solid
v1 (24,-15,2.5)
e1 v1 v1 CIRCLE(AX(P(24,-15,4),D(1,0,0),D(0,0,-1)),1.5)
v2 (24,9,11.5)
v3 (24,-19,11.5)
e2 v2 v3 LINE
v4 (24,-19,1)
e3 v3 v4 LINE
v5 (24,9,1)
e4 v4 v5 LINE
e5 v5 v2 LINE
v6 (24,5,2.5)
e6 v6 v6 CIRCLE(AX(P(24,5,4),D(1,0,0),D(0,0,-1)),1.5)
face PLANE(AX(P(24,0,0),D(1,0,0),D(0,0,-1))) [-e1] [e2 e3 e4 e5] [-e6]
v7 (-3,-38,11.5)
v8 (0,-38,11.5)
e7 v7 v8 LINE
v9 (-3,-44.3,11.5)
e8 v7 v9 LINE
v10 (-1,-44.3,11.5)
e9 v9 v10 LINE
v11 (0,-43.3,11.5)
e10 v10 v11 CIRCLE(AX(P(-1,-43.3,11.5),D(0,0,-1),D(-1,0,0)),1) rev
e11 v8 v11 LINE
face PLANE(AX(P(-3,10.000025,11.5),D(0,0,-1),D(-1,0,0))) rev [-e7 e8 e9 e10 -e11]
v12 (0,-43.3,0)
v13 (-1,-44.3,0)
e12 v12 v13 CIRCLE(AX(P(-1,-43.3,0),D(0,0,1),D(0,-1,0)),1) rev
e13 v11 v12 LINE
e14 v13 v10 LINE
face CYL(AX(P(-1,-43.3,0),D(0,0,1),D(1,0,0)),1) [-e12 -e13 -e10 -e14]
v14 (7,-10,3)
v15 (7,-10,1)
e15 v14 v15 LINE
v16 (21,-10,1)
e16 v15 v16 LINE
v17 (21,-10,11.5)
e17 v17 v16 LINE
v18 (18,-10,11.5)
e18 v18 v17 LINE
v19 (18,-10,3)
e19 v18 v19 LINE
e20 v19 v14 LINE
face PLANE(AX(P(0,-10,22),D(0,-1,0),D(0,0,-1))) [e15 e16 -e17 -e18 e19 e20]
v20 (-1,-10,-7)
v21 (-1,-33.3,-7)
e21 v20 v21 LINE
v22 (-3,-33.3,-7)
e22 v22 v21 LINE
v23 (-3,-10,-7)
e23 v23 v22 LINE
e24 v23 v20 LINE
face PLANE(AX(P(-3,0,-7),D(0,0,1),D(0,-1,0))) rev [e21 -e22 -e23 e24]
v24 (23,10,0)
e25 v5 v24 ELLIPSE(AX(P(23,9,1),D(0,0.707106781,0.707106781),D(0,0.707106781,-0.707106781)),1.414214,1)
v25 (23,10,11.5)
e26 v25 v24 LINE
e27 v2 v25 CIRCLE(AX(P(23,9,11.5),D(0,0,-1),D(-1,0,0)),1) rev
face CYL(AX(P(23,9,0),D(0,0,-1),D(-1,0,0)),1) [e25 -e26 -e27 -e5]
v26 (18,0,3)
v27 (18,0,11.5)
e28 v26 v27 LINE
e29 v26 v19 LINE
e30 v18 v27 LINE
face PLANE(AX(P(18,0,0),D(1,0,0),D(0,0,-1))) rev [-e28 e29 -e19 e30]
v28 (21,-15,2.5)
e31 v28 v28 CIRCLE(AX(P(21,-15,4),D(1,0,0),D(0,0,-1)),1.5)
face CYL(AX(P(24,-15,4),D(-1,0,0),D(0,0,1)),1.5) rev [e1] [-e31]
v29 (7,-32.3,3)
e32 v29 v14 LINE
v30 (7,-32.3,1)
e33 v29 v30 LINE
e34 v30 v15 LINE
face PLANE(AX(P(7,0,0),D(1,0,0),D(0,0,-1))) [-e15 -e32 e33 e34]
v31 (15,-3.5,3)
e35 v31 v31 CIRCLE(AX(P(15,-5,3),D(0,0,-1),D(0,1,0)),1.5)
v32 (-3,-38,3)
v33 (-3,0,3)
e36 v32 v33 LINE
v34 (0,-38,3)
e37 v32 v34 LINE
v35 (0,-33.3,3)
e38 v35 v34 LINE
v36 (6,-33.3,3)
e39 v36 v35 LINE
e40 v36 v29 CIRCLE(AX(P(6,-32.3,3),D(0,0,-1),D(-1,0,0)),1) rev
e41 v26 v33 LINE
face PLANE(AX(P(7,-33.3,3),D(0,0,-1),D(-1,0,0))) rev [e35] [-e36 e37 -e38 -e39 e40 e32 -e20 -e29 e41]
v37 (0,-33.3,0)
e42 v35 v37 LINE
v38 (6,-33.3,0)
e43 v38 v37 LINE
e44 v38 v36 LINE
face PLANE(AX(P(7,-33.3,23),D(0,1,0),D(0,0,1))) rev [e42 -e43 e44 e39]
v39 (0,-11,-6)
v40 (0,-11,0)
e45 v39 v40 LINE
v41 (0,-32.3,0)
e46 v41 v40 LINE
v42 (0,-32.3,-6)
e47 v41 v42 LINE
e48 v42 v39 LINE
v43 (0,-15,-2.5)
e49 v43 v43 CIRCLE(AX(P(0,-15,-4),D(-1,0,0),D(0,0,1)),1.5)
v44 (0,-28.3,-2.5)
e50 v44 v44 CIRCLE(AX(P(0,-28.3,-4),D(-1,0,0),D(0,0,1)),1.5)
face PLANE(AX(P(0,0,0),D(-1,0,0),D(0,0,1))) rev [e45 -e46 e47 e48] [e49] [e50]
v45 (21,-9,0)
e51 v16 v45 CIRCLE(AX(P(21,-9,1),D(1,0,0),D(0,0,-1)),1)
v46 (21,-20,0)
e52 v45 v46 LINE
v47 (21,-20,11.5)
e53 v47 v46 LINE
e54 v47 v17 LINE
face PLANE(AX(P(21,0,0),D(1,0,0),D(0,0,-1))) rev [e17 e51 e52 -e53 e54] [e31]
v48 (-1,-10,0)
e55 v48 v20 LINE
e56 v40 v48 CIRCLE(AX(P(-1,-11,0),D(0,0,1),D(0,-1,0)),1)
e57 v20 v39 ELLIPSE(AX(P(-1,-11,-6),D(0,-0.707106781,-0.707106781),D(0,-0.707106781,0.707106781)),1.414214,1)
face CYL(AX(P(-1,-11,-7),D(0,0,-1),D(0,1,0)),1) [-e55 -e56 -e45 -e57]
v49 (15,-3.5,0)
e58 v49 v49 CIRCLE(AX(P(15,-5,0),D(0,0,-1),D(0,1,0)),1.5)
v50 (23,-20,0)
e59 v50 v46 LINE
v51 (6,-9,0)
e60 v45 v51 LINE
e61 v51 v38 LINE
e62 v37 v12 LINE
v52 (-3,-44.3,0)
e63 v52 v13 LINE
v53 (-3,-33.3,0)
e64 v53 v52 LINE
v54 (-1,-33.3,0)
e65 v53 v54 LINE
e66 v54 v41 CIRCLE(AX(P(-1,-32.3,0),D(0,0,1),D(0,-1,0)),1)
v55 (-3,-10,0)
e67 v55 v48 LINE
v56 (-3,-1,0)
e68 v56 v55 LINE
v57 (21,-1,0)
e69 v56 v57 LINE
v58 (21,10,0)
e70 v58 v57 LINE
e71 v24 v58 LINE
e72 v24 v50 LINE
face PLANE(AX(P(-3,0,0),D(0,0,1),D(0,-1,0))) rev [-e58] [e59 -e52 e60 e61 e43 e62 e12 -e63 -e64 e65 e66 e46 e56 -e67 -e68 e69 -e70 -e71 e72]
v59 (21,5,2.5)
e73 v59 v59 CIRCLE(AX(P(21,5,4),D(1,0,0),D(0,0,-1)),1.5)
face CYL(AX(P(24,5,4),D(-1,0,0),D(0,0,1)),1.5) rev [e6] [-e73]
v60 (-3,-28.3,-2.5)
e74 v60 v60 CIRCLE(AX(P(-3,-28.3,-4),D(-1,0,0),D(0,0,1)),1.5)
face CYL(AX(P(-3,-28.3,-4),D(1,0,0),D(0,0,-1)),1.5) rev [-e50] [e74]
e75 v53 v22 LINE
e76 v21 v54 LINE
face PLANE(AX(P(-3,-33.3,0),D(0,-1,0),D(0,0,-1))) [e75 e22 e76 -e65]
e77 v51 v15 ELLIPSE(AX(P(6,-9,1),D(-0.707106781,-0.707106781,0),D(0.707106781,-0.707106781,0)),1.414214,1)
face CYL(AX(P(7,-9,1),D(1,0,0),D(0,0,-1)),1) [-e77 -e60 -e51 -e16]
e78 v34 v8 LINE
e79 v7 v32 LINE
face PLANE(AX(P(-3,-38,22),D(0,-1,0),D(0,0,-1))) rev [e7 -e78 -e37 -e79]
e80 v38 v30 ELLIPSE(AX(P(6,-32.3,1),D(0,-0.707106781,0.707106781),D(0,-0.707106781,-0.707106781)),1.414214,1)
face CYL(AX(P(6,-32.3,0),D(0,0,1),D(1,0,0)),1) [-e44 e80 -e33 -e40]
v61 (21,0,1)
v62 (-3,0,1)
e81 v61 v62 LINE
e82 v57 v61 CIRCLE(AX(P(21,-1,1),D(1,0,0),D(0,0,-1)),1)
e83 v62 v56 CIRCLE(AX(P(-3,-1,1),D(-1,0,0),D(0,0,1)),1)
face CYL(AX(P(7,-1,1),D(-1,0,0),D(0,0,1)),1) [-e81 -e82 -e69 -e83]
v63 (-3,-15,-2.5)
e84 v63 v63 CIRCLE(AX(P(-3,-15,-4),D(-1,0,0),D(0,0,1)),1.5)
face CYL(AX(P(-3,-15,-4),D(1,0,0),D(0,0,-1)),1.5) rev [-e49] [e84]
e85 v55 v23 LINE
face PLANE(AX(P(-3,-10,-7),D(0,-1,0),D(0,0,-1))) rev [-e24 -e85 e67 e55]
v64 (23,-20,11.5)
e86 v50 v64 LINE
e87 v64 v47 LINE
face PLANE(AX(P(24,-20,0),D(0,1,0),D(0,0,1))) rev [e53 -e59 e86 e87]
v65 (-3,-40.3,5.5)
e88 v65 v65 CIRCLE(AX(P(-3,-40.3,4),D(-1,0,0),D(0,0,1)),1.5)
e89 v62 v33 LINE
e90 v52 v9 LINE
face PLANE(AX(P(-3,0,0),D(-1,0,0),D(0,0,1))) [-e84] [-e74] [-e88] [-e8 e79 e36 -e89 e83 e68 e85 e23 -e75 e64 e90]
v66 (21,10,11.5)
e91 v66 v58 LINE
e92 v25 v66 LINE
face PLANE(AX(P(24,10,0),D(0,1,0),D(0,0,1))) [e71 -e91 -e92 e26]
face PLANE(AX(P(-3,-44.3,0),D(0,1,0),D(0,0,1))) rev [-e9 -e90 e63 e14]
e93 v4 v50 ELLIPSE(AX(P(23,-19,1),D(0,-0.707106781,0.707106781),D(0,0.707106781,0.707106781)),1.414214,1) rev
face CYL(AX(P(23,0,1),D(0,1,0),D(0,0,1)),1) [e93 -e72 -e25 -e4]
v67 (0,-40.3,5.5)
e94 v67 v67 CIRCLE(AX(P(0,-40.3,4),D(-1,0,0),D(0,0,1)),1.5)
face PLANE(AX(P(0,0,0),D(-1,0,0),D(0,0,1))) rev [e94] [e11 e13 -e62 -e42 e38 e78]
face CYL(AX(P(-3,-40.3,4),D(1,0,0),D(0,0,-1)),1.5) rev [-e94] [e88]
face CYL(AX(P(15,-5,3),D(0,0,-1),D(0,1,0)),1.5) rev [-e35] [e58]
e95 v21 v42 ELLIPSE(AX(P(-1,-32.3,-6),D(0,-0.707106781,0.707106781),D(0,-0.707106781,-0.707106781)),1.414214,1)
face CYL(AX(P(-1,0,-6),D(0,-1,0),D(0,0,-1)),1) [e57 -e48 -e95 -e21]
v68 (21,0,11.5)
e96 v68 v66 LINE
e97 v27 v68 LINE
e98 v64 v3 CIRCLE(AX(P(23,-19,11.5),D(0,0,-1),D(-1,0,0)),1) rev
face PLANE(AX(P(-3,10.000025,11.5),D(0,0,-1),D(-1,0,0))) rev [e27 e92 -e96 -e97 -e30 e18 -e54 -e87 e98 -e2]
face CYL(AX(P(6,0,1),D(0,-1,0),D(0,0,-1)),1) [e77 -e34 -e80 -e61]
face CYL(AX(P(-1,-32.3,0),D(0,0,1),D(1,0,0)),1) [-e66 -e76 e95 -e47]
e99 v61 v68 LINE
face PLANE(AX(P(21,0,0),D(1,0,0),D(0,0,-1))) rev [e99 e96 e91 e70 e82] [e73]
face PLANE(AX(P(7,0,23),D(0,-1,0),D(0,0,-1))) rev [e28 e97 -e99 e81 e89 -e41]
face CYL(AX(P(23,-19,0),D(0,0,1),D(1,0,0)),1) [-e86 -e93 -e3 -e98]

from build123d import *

# Parameters (mm, degrees)
CROQUIS1_W              = 23
CROQUIS1_H              = 33.3
SALIENTE_EXTRUIR2_DEPTH = 7
CROQUIS3_W              = 4
CROQUIS3_H              = 19
CORTAR_EXTRUIR1_DEPTH   = 42.071766458
CROQUIS7_R              = 1.5
SALIENTE_EXTRUIR3_DEPTH = 3
CROQUIS8_W              = 18
CROQUIS8_H              = 10
CROQUIS8_R              = 1.5
SALIENTE_EXTRUIR5_DEPTH = 1
SALIENTE_EXTRUIR6_START = -3
CROQUIS9_W              = 18
CROQUIS9_H              = 10
CROQUIS9_R              = 1.5
SALIENTE_EXTRUIR6_DEPTH = 3
CROQUIS10_W             = 23
CROQUIS10_H             = 10
SALIENTE_EXTRUIR7_DEPTH = 3
CROQUIS11_W             = 19
CROQUIS11_H             = 38
CORTAR_EXTRUIR5_DEPTH   = 57.449003534
CROQUIS14_W             = 7
CROQUIS14_H             = 16
CORTAR_EXTRUIR7_DEPTH   = 1
CROQUIS15_W             = 7
CROQUIS15_H             = 10
CORTAR_EXTRUIR8_DEPTH   = 58.475994989
CROQUIS17_W             = 23
CROQUIS17_H             = 10
CROQUIS17_R             = 1.5
SALIENTE_EXTRUIR8_DEPTH = 3
REDONDEO2_R             = 1
CROQUIS18_W             = 27
CROQUIS18_H             = 18.5
CORTAR_EXTRUIR10_DEPTH  = 67.516839973


with BuildPart() as part:
    # Croquis1 → Saliente-Extruir2 (new body)
    with BuildSketch(Plane(origin=(0, 0, 0), x_dir=(0, 0, -1), z_dir=(1, 0, 0))):
        with Locations((-11.5, -16.65)):
            Rectangle(CROQUIS1_W, CROQUIS1_H)
    extrude(amount=SALIENTE_EXTRUIR2_DEPTH)

    # Croquis3 → Cortar-Extruir1 (cut, through all)
    with BuildSketch(Plane(origin=(0, 0, 0), x_dir=(1, 0, 0), z_dir=(0, 1, 0))):
        with Locations((5, -12.5)):
            Rectangle(CROQUIS3_W, CROQUIS3_H)
    extrude(amount=-CORTAR_EXTRUIR1_DEPTH, mode=Mode.SUBTRACT)



with BuildPart() as body_2:
    # Croquis7 → Saliente-Extruir3 (new body)
    with BuildSketch(Plane.ZY):
        Polygon((-7, 0), (-7, -33.3), (0, -33.3), (0, -44.3), (23, -44.3), (23, -33.3), (30, -33.3), (30, 0), align=None)
        with Locations((-4, -28.3)):
            Circle(CROQUIS7_R, mode=Mode.SUBTRACT)
        with Locations((-4, -15)):
            Circle(CROQUIS7_R, mode=Mode.SUBTRACT)
        with Locations((27, -15)):
            Circle(CROQUIS7_R, mode=Mode.SUBTRACT)
        with Locations((27, -28.3)):
            Circle(CROQUIS7_R, mode=Mode.SUBTRACT)
        with Locations((19, -40.3)):
            Circle(CROQUIS7_R, mode=Mode.SUBTRACT)
        with Locations((4, -40.3)):
            Circle(CROQUIS7_R, mode=Mode.SUBTRACT)
    extrude(amount=SALIENTE_EXTRUIR3_DEPTH)


with BuildPart() as part_1:
    add(part.part)

    add(body_2.part)  # Saliente-Extruir5 merges body 2
    # Croquis8 → Saliente-Extruir5 (add)
    with BuildSketch(Plane.XY.offset(23)):
        with Locations((9, -5)):
            Rectangle(CROQUIS8_W, CROQUIS8_H)
        with Locations((15, -5)):
            Circle(CROQUIS8_R, mode=Mode.SUBTRACT)
        with Locations((3, -5)):
            Circle(CROQUIS8_R, mode=Mode.SUBTRACT)
    extrude(amount=-SALIENTE_EXTRUIR5_DEPTH)

    # Croquis9 → Saliente-Extruir6 (add)
    with BuildSketch(Plane(origin=(0, 0, 0), x_dir=(-1, 0, 0), z_dir=(0, 0, -1)).offset(SALIENTE_EXTRUIR6_START)):
        with Locations((-9, -5)):
            Rectangle(CROQUIS9_W, CROQUIS9_H)
        with Locations(Location((-15, -5, 0), (0, 0, 180))):
            Circle(CROQUIS9_R, mode=Mode.SUBTRACT)
    extrude(amount=SALIENTE_EXTRUIR6_DEPTH)

    # Croquis10 → Saliente-Extruir7 (add)
    with BuildSketch(Plane(origin=(18, 0, 0), x_dir=(0, 0, -1), z_dir=(1, 0, 0))):
        with Locations((-11.5, -5)):
            Rectangle(CROQUIS10_W, CROQUIS10_H)
    extrude(amount=SALIENTE_EXTRUIR7_DEPTH)

    # Croquis11 → Cortar-Extruir5 (cut, through all)
    with BuildSketch(Plane(origin=(3, 0, 0), x_dir=(0, 0, -1), z_dir=(1, 0, 0))):
        with Locations((-12.5, -19)):
            Rectangle(CROQUIS11_W, CROQUIS11_H)
    extrude(amount=-CORTAR_EXTRUIR5_DEPTH, mode=Mode.SUBTRACT)

    # Croquis14 → Cortar-Extruir7 (cut)
    with BuildSketch(Plane.XY.offset(23)):
        with Locations((3.5, -25.3)):
            Rectangle(CROQUIS14_W, CROQUIS14_H)
    extrude(amount=-CORTAR_EXTRUIR7_DEPTH, mode=Mode.SUBTRACT)

    # Croquis15 → Cortar-Extruir8 (cut, through all)
    with BuildSketch(Plane(origin=(0, 0, 0), x_dir=(0, 0, -1), z_dir=(1, 0, 0))):
        with Locations((-26.5, -5)):
            Rectangle(CROQUIS15_W, CROQUIS15_H)
        with Locations((3.5, -5)):
            Rectangle(CROQUIS15_W, CROQUIS15_H)
    extrude(amount=-CORTAR_EXTRUIR8_DEPTH, mode=Mode.SUBTRACT)

    # Croquis17 → Saliente-Extruir8 (add)
    # profile 1 of 3: a face of its own
    with BuildSketch(Plane(origin=(21, 0, 0), x_dir=(0, 0, -1), z_dir=(1, 0, 0))):
        with Locations((-11.5, -15)):
            Rectangle(CROQUIS17_W, CROQUIS17_H)
        with Locations((-4, -15)):
            Circle(CROQUIS17_R, mode=Mode.SUBTRACT)
        with Locations((-19, -15)):
            Circle(CROQUIS17_R, mode=Mode.SUBTRACT)
    # profile 2 of 3: a face of its own
    with BuildSketch(Plane(origin=(21, 0, 0), x_dir=(0, 0, -1), z_dir=(1, 0, 0))):
        with Locations((-11.5, -5)):
            Rectangle(CROQUIS17_W, CROQUIS17_H)
    # profile 3 of 3: a face of its own
    with BuildSketch(Plane(origin=(21, 0, 0), x_dir=(0, 0, -1), z_dir=(1, 0, 0))):
        with Locations((-11.5, 5)):
            Rectangle(CROQUIS17_W, CROQUIS17_H)
        with Locations((-19, 5)):
            Circle(CROQUIS17_R, mode=Mode.SUBTRACT)
        with Locations((-4, 5)):
            Circle(CROQUIS17_R, mode=Mode.SUBTRACT)
    extrude(amount=SALIENTE_EXTRUIR8_DEPTH)

    # Redondeo2
    # the kernel refuses this fillet: 1 mm, written as the material it takes off along each edge
    with BuildSketch(Plane(origin=(0, -44.3, 23), x_dir=(0, 0, -1), z_dir=(0, 1, 0))) as redondeo2_piece_1:
        with BuildLine():
            CenterArc((REDONDEO2_R, REDONDEO2_R), REDONDEO2_R, 180, 90)
            Line((0, REDONDEO2_R), (-REDONDEO2_R * 0.02, REDONDEO2_R))
            Line((-REDONDEO2_R * 0.02, REDONDEO2_R), (-REDONDEO2_R * 0.02, -REDONDEO2_R * 0.02))
            Line((-REDONDEO2_R * 0.02, -REDONDEO2_R * 0.02), (REDONDEO2_R, -REDONDEO2_R * 0.02))
            Line((REDONDEO2_R, -REDONDEO2_R * 0.02), (REDONDEO2_R, 0))
        make_face()
    extrude(amount=11, mode=Mode.SUBTRACT)
    with BuildSketch(Plane(origin=(0, -44.3, 0), x_dir=(0, 1, 0), z_dir=(0, 0, 1)), Plane(origin=(24, 10, 0), x_dir=(-1, 0, 0), z_dir=(0, 0, 1))) as redondeo2_piece_2:
        with BuildLine():
            CenterArc((REDONDEO2_R, REDONDEO2_R), REDONDEO2_R, 180, 90)
            Line((0, REDONDEO2_R), (-REDONDEO2_R * 0.02, REDONDEO2_R))
            Line((-REDONDEO2_R * 0.02, REDONDEO2_R), (-REDONDEO2_R * 0.02, -REDONDEO2_R * 0.02))
            Line((-REDONDEO2_R * 0.02, -REDONDEO2_R * 0.02), (REDONDEO2_R, -REDONDEO2_R * 0.02))
            Line((REDONDEO2_R, -REDONDEO2_R * 0.02), (REDONDEO2_R, 0))
        make_face()
    extrude(amount=23, mode=Mode.SUBTRACT)
    with BuildSketch(Plane(origin=(0, -10, 23), x_dir=(0, -1, 0), z_dir=(0, 0, 1)), Plane(origin=(0, -10, 0), x_dir=(-1, 0, 0), z_dir=(0, 0, -1))) as redondeo2_piece_3:
        with BuildLine():
            CenterArc((REDONDEO2_R, -REDONDEO2_R), REDONDEO2_R, 90, 90)
            Line((0, -REDONDEO2_R), (-REDONDEO2_R * 0.02, -REDONDEO2_R))
            Line((-REDONDEO2_R * 0.02, -REDONDEO2_R), (-REDONDEO2_R * 0.02, REDONDEO2_R * 0.02))
            Line((-REDONDEO2_R * 0.02, REDONDEO2_R * 0.02), (REDONDEO2_R, REDONDEO2_R * 0.02))
            Line((REDONDEO2_R, REDONDEO2_R * 0.02), (REDONDEO2_R, 0))
        make_face()
    extrude(amount=7, mode=Mode.SUBTRACT)
    with BuildSketch(Plane(origin=(0, -33.3, 23), x_dir=(0, 1, 0), z_dir=(0, 0, 1)), Plane(origin=(0, -33.3, -7), x_dir=(0, 1, 0), z_dir=(0, 0, 1))) as redondeo2_piece_4:
        with BuildLine():
            CenterArc((REDONDEO2_R, REDONDEO2_R), REDONDEO2_R, 180, 90)
            Line((0, REDONDEO2_R), (-REDONDEO2_R * 0.02, REDONDEO2_R))
            Line((-REDONDEO2_R * 0.02, REDONDEO2_R), (-REDONDEO2_R * 0.02, -REDONDEO2_R * 0.02))
            Line((-REDONDEO2_R * 0.02, -REDONDEO2_R * 0.02), (REDONDEO2_R, -REDONDEO2_R * 0.02))
            Line((REDONDEO2_R, -REDONDEO2_R * 0.02), (REDONDEO2_R, 0))
        make_face()
    extrude(amount=7, mode=Mode.SUBTRACT)
    with BuildSketch(Plane(origin=(0, -33.3, 30), x_dir=(0, 0, -1), z_dir=(0, 1, 0)), Plane(origin=(0, -10, -7), x_dir=(0, 0, 1), z_dir=(0, -1, 0))) as redondeo2_piece_5:
        with BuildLine():
            CenterArc((REDONDEO2_R, REDONDEO2_R), REDONDEO2_R, 180, 90)
            Line((0, REDONDEO2_R), (-REDONDEO2_R * 0.02, REDONDEO2_R))
            Line((-REDONDEO2_R * 0.02, REDONDEO2_R), (-REDONDEO2_R * 0.02, -REDONDEO2_R * 0.02))
            Line((-REDONDEO2_R * 0.02, -REDONDEO2_R * 0.02), (REDONDEO2_R, -REDONDEO2_R * 0.02))
            Line((REDONDEO2_R, -REDONDEO2_R * 0.02), (REDONDEO2_R, 0))
        make_face()
    extrude(amount=23.3, mode=Mode.SUBTRACT)
    with BuildSketch(Plane(origin=(7, -33.3, 0), x_dir=(-1, 0, 0), z_dir=(0, 0, 1))) as redondeo2_piece_6:
        with BuildLine():
            CenterArc((REDONDEO2_R, -REDONDEO2_R), REDONDEO2_R, 90, 90)
            Line((0, -REDONDEO2_R), (-REDONDEO2_R * 0.02, -REDONDEO2_R))
            Line((-REDONDEO2_R * 0.02, -REDONDEO2_R), (-REDONDEO2_R * 0.02, REDONDEO2_R * 0.02))
            Line((-REDONDEO2_R * 0.02, REDONDEO2_R * 0.02), (REDONDEO2_R, REDONDEO2_R * 0.02))
            Line((REDONDEO2_R, REDONDEO2_R * 0.02), (REDONDEO2_R, 0))
        make_face()
    extrude(amount=3, mode=Mode.SUBTRACT)
    with BuildSketch(Plane(origin=(7, -10, 0), x_dir=(-1, 0, 0), z_dir=(0, -1, 0))) as redondeo2_piece_7:
        with BuildLine():
            CenterArc((REDONDEO2_R, -REDONDEO2_R), REDONDEO2_R, 90, 90)
            Line((0, -REDONDEO2_R), (-REDONDEO2_R * 0.02, -REDONDEO2_R))
            Line((-REDONDEO2_R * 0.02, -REDONDEO2_R), (-REDONDEO2_R * 0.02, REDONDEO2_R * 0.02))
            Line((-REDONDEO2_R * 0.02, REDONDEO2_R * 0.02), (REDONDEO2_R, REDONDEO2_R * 0.02))
            Line((REDONDEO2_R, REDONDEO2_R * 0.02), (REDONDEO2_R, 0))
        make_face()
    extrude(amount=23.3, mode=Mode.SUBTRACT)
    with BuildSketch(Plane(origin=(21, -10, 0), x_dir=(0, 1, 0), z_dir=(-1, 0, 0))) as redondeo2_piece_8:
        with BuildLine():
            CenterArc((REDONDEO2_R, -REDONDEO2_R), REDONDEO2_R, 90, 90)
            Line((0, -REDONDEO2_R), (-REDONDEO2_R * 0.02, -REDONDEO2_R))
            Line((-REDONDEO2_R * 0.02, -REDONDEO2_R), (-REDONDEO2_R * 0.02, REDONDEO2_R * 0.02))
            Line((-REDONDEO2_R * 0.02, REDONDEO2_R * 0.02), (REDONDEO2_R, REDONDEO2_R * 0.02))
            Line((REDONDEO2_R, REDONDEO2_R * 0.02), (REDONDEO2_R, 0))
        make_face()
    extrude(amount=14, mode=Mode.SUBTRACT)
    with BuildSketch(Plane(origin=(21, 0, 0), x_dir=(0, -1, 0), z_dir=(-1, 0, 0))) as redondeo2_piece_9:
        with BuildLine():
            CenterArc((REDONDEO2_R, REDONDEO2_R), REDONDEO2_R, 180, 90)
            Line((0, REDONDEO2_R), (-REDONDEO2_R * 0.02, REDONDEO2_R))
            Line((-REDONDEO2_R * 0.02, REDONDEO2_R), (-REDONDEO2_R * 0.02, -REDONDEO2_R * 0.02))
            Line((-REDONDEO2_R * 0.02, -REDONDEO2_R * 0.02), (REDONDEO2_R, -REDONDEO2_R * 0.02))
            Line((REDONDEO2_R, -REDONDEO2_R * 0.02), (REDONDEO2_R, 0))
        make_face()
    extrude(amount=24, mode=Mode.SUBTRACT)
    with BuildSketch(Plane(origin=(24, 10, 0), x_dir=(-1, 0, 0), z_dir=(0, -1, 0)), Plane(origin=(24, 10, 23), x_dir=(0, 0, -1), z_dir=(0, -1, 0))) as redondeo2_piece_10:
        with BuildLine():
            CenterArc((REDONDEO2_R, -REDONDEO2_R), REDONDEO2_R, 90, 90)
            Line((0, -REDONDEO2_R), (-REDONDEO2_R * 0.02, -REDONDEO2_R))
            Line((-REDONDEO2_R * 0.02, -REDONDEO2_R), (-REDONDEO2_R * 0.02, REDONDEO2_R * 0.02))
            Line((-REDONDEO2_R * 0.02, REDONDEO2_R * 0.02), (REDONDEO2_R, REDONDEO2_R * 0.02))
            Line((REDONDEO2_R, REDONDEO2_R * 0.02), (REDONDEO2_R, 0))
        make_face()
    extrude(amount=30, mode=Mode.SUBTRACT)
    with BuildSketch(Plane(origin=(24, -20, 0), x_dir=(-1, 0, 0), z_dir=(0, 0, 1))) as redondeo2_piece_11:
        with BuildLine():
            CenterArc((REDONDEO2_R, -REDONDEO2_R), REDONDEO2_R, 90, 90)
            Line((0, -REDONDEO2_R), (-REDONDEO2_R * 0.02, -REDONDEO2_R))
            Line((-REDONDEO2_R * 0.02, -REDONDEO2_R), (-REDONDEO2_R * 0.02, REDONDEO2_R * 0.02))
            Line((-REDONDEO2_R * 0.02, REDONDEO2_R * 0.02), (REDONDEO2_R, REDONDEO2_R * 0.02))
            Line((REDONDEO2_R, REDONDEO2_R * 0.02), (REDONDEO2_R, 0))
        make_face()
    extrude(amount=23, mode=Mode.SUBTRACT)
    with BuildSketch(Plane(origin=(0, -46.8, 23), x_dir=(0, 0, -1), z_dir=(0, 1, 0))) as redondeo2_piece_12a_section:
        with BuildLine():
            CenterArc((REDONDEO2_R, REDONDEO2_R), REDONDEO2_R, 180, 90)
            Line((0, REDONDEO2_R), (-REDONDEO2_R * 0.02, REDONDEO2_R))
            Line((-REDONDEO2_R * 0.02, REDONDEO2_R), (-REDONDEO2_R * 0.02, -REDONDEO2_R * 0.02))
            Line((-REDONDEO2_R * 0.02, -REDONDEO2_R * 0.02), (REDONDEO2_R, -REDONDEO2_R * 0.02))
            Line((REDONDEO2_R, -REDONDEO2_R * 0.02), (REDONDEO2_R, 0))
        make_face()
    redondeo2_piece_12a = extrude(amount=13.5, mode=Mode.PRIVATE)
    redondeo2_piece_12a = split(redondeo2_piece_12a, bisect_by=Plane(origin=(-0.226395114, -44.3, 22.773604886), z_dir=(0, -1, 0)), keep=Keep.TOP, mode=Mode.PRIVATE)
    with BuildSketch(Plane(origin=(0, -44.3, 0), x_dir=(0, 1, 0), z_dir=(0, 0, 1))) as redondeo2_piece_12b_section:
        with BuildLine():
            CenterArc((REDONDEO2_R, REDONDEO2_R), REDONDEO2_R, 180, 90)
            Line((0, REDONDEO2_R), (-REDONDEO2_R * 0.02, REDONDEO2_R))
            Line((-REDONDEO2_R * 0.02, REDONDEO2_R), (-REDONDEO2_R * 0.02, -REDONDEO2_R * 0.02))
            Line((-REDONDEO2_R * 0.02, -REDONDEO2_R * 0.02), (REDONDEO2_R, -REDONDEO2_R * 0.02))
            Line((REDONDEO2_R, -REDONDEO2_R * 0.02), (REDONDEO2_R, 0))
        make_face()
    redondeo2_piece_12b = extrude(amount=25.5, mode=Mode.PRIVATE)
    redondeo2_piece_12b = split(redondeo2_piece_12b, bisect_by=Plane(origin=(-0.226395114, -44.073604886, 23), z_dir=(0, 0, 1)), keep=Keep.TOP, mode=Mode.PRIVATE)
    redondeo2_piece_12 = redondeo2_piece_12a & redondeo2_piece_12b
    add(redondeo2_piece_12, mode=Mode.SUBTRACT)
    with BuildSketch(Plane(origin=(0, -33.3, 20.5), x_dir=(0, 1, 0), z_dir=(0, 0, 1))) as redondeo2_piece_13a_section:
        with BuildLine():
            CenterArc((REDONDEO2_R, REDONDEO2_R), REDONDEO2_R, 180, 90)
            Line((0, REDONDEO2_R), (-REDONDEO2_R * 0.02, REDONDEO2_R))
            Line((-REDONDEO2_R * 0.02, REDONDEO2_R), (-REDONDEO2_R * 0.02, -REDONDEO2_R * 0.02))
            Line((-REDONDEO2_R * 0.02, -REDONDEO2_R * 0.02), (REDONDEO2_R, -REDONDEO2_R * 0.02))
            Line((REDONDEO2_R, -REDONDEO2_R * 0.02), (REDONDEO2_R, 0))
        make_face()
    redondeo2_piece_13a = extrude(amount=9.5, mode=Mode.PRIVATE)
    redondeo2_piece_13a = split(redondeo2_piece_13a, bisect_by=Plane(origin=(-0.226395114, -33.073604886, 23), z_dir=(0, 0, -1)), keep=Keep.TOP, mode=Mode.PRIVATE)
    with BuildSketch(Plane(origin=(0, -44.3, 23), x_dir=(0, 0, -1), z_dir=(0, 1, 0))) as redondeo2_piece_13b_section:
        with BuildLine():
            CenterArc((REDONDEO2_R, REDONDEO2_R), REDONDEO2_R, 180, 90)
            Line((0, REDONDEO2_R), (-REDONDEO2_R * 0.02, REDONDEO2_R))
            Line((-REDONDEO2_R * 0.02, REDONDEO2_R), (-REDONDEO2_R * 0.02, -REDONDEO2_R * 0.02))
            Line((-REDONDEO2_R * 0.02, -REDONDEO2_R * 0.02), (REDONDEO2_R, -REDONDEO2_R * 0.02))
            Line((REDONDEO2_R, -REDONDEO2_R * 0.02), (REDONDEO2_R, 0))
        make_face()
    redondeo2_piece_13b = extrude(amount=13.5, mode=Mode.PRIVATE)
    redondeo2_piece_13b = split(redondeo2_piece_13b, bisect_by=Plane(origin=(-0.226395114, -33.3, 22.773604886), z_dir=(0, 1, 0)), keep=Keep.TOP, mode=Mode.PRIVATE)
    redondeo2_piece_13 = redondeo2_piece_13a & redondeo2_piece_13b
    add(redondeo2_piece_13, mode=Mode.SUBTRACT)
    with BuildSketch(Plane(origin=(0, -10, 23), x_dir=(0, -1, 0), z_dir=(0, 0, 1))) as redondeo2_piece_14a_section:
        with BuildLine():
            CenterArc((REDONDEO2_R, -REDONDEO2_R), REDONDEO2_R, 90, 90)
            Line((0, -REDONDEO2_R), (-REDONDEO2_R * 0.02, -REDONDEO2_R))
            Line((-REDONDEO2_R * 0.02, -REDONDEO2_R), (-REDONDEO2_R * 0.02, REDONDEO2_R * 0.02))
            Line((-REDONDEO2_R * 0.02, REDONDEO2_R * 0.02), (REDONDEO2_R, REDONDEO2_R * 0.02))
            Line((REDONDEO2_R, REDONDEO2_R * 0.02), (REDONDEO2_R, 0))
        make_face()
    redondeo2_piece_14a = extrude(amount=9.5, mode=Mode.PRIVATE)
    redondeo2_piece_14a = split(redondeo2_piece_14a, bisect_by=Plane(origin=(-0.226395114, -10.226395114, 30), z_dir=(0, 0, 1)), keep=Keep.TOP, mode=Mode.PRIVATE)
    with BuildSketch(Plane(origin=(0, -33.3, 30), x_dir=(0, 0, -1), z_dir=(0, 1, 0))) as redondeo2_piece_14b_section:
        with BuildLine():
            CenterArc((REDONDEO2_R, REDONDEO2_R), REDONDEO2_R, 180, 90)
            Line((0, REDONDEO2_R), (-REDONDEO2_R * 0.02, REDONDEO2_R))
            Line((-REDONDEO2_R * 0.02, REDONDEO2_R), (-REDONDEO2_R * 0.02, -REDONDEO2_R * 0.02))
            Line((-REDONDEO2_R * 0.02, -REDONDEO2_R * 0.02), (REDONDEO2_R, -REDONDEO2_R * 0.02))
            Line((REDONDEO2_R, -REDONDEO2_R * 0.02), (REDONDEO2_R, 0))
        make_face()
    redondeo2_piece_14b = extrude(amount=25.8, mode=Mode.PRIVATE)
    redondeo2_piece_14b = split(redondeo2_piece_14b, bisect_by=Plane(origin=(-0.226395114, -10, 29.773604886), z_dir=(0, 1, 0)), keep=Keep.TOP, mode=Mode.PRIVATE)
    redondeo2_piece_14 = redondeo2_piece_14a & redondeo2_piece_14b
    add(redondeo2_piece_14, mode=Mode.SUBTRACT)
    with BuildSketch(Plane(origin=(0, -33.3, 23), x_dir=(0, 1, 0), z_dir=(0, 0, 1))) as redondeo2_piece_15a_section:
        with BuildLine():
            CenterArc((REDONDEO2_R, REDONDEO2_R), REDONDEO2_R, 180, 90)
            Line((0, REDONDEO2_R), (-REDONDEO2_R * 0.02, REDONDEO2_R))
            Line((-REDONDEO2_R * 0.02, REDONDEO2_R), (-REDONDEO2_R * 0.02, -REDONDEO2_R * 0.02))
            Line((-REDONDEO2_R * 0.02, -REDONDEO2_R * 0.02), (REDONDEO2_R, -REDONDEO2_R * 0.02))
            Line((REDONDEO2_R, -REDONDEO2_R * 0.02), (REDONDEO2_R, 0))
        make_face()
    redondeo2_piece_15a = extrude(amount=9.5, mode=Mode.PRIVATE)
    redondeo2_piece_15a = split(redondeo2_piece_15a, bisect_by=Plane(origin=(-0.226395114, -33.073604886, 30), z_dir=(0, 0, 1)), keep=Keep.TOP, mode=Mode.PRIVATE)
    with BuildSketch(Plane(origin=(0, -35.8, 30), x_dir=(0, 0, -1), z_dir=(0, 1, 0))) as redondeo2_piece_15b_section:
        with BuildLine():
            CenterArc((REDONDEO2_R, REDONDEO2_R), REDONDEO2_R, 180, 90)
            Line((0, REDONDEO2_R), (-REDONDEO2_R * 0.02, REDONDEO2_R))
            Line((-REDONDEO2_R * 0.02, REDONDEO2_R), (-REDONDEO2_R * 0.02, -REDONDEO2_R * 0.02))
            Line((-REDONDEO2_R * 0.02, -REDONDEO2_R * 0.02), (REDONDEO2_R, -REDONDEO2_R * 0.02))
            Line((REDONDEO2_R, -REDONDEO2_R * 0.02), (REDONDEO2_R, 0))
        make_face()
    redondeo2_piece_15b = extrude(amount=25.8, mode=Mode.PRIVATE)
    redondeo2_piece_15b = split(redondeo2_piece_15b, bisect_by=Plane(origin=(-0.226395114, -33.3, 29.773604886), z_dir=(0, -1, 0)), keep=Keep.TOP, mode=Mode.PRIVATE)
    redondeo2_piece_15 = redondeo2_piece_15a & redondeo2_piece_15b
    add(redondeo2_piece_15, mode=Mode.SUBTRACT)
    with BuildSketch(Plane(origin=(7, -10, 0), x_dir=(-1, 0, 0), z_dir=(0, -1, 0))) as redondeo2_piece_16a_section:
        with BuildLine():
            CenterArc((REDONDEO2_R, -REDONDEO2_R), REDONDEO2_R, 90, 90)
            Line((0, -REDONDEO2_R), (-REDONDEO2_R * 0.02, -REDONDEO2_R))
            Line((-REDONDEO2_R * 0.02, -REDONDEO2_R), (-REDONDEO2_R * 0.02, REDONDEO2_R * 0.02))
            Line((-REDONDEO2_R * 0.02, REDONDEO2_R * 0.02), (REDONDEO2_R, REDONDEO2_R * 0.02))
            Line((REDONDEO2_R, REDONDEO2_R * 0.02), (REDONDEO2_R, 0))
        make_face()
    redondeo2_piece_16a = extrude(amount=25.8, mode=Mode.PRIVATE)
    redondeo2_piece_16a = split(redondeo2_piece_16a, bisect_by=Plane(origin=(6.773604886, -33.3, 0.226395114), z_dir=(0, -1, 0)), keep=Keep.TOP, mode=Mode.PRIVATE)
    with BuildSketch(Plane(origin=(7, -33.3, -2.5), x_dir=(-1, 0, 0), z_dir=(0, 0, 1))) as redondeo2_piece_16b_section:
        with BuildLine():
            CenterArc((REDONDEO2_R, -REDONDEO2_R), REDONDEO2_R, 90, 90)
            Line((0, -REDONDEO2_R), (-REDONDEO2_R * 0.02, -REDONDEO2_R))
            Line((-REDONDEO2_R * 0.02, -REDONDEO2_R), (-REDONDEO2_R * 0.02, REDONDEO2_R * 0.02))
            Line((-REDONDEO2_R * 0.02, REDONDEO2_R * 0.02), (REDONDEO2_R, REDONDEO2_R * 0.02))
            Line((REDONDEO2_R, REDONDEO2_R * 0.02), (REDONDEO2_R, 0))
        make_face()
    redondeo2_piece_16b = extrude(amount=5.5, mode=Mode.PRIVATE)
    redondeo2_piece_16b = split(redondeo2_piece_16b, bisect_by=Plane(origin=(6.773604886, -33.073604886, 0), z_dir=(0, 0, -1)), keep=Keep.TOP, mode=Mode.PRIVATE)
    redondeo2_piece_16 = redondeo2_piece_16a & redondeo2_piece_16b
    add(redondeo2_piece_16, mode=Mode.SUBTRACT)
    with BuildSketch(Plane(origin=(0, -33.3, -9.5), x_dir=(0, 1, 0), z_dir=(0, 0, 1))) as redondeo2_piece_17a_section:
        with BuildLine():
            CenterArc((REDONDEO2_R, REDONDEO2_R), REDONDEO2_R, 180, 90)
            Line((0, REDONDEO2_R), (-REDONDEO2_R * 0.02, REDONDEO2_R))
            Line((-REDONDEO2_R * 0.02, REDONDEO2_R), (-REDONDEO2_R * 0.02, -REDONDEO2_R * 0.02))
            Line((-REDONDEO2_R * 0.02, -REDONDEO2_R * 0.02), (REDONDEO2_R, -REDONDEO2_R * 0.02))
            Line((REDONDEO2_R, -REDONDEO2_R * 0.02), (REDONDEO2_R, 0))
        make_face()
    redondeo2_piece_17a = extrude(amount=9.5, mode=Mode.PRIVATE)
    redondeo2_piece_17a = split(redondeo2_piece_17a, bisect_by=Plane(origin=(-0.226395114, -33.073604886, -7), z_dir=(0, 0, -1)), keep=Keep.TOP, mode=Mode.PRIVATE)
    with BuildSketch(Plane(origin=(0, -10, -7), x_dir=(0, 0, 1), z_dir=(0, -1, 0))) as redondeo2_piece_17b_section:
        with BuildLine():
            CenterArc((REDONDEO2_R, REDONDEO2_R), REDONDEO2_R, 180, 90)
            Line((0, REDONDEO2_R), (-REDONDEO2_R * 0.02, REDONDEO2_R))
            Line((-REDONDEO2_R * 0.02, REDONDEO2_R), (-REDONDEO2_R * 0.02, -REDONDEO2_R * 0.02))
            Line((-REDONDEO2_R * 0.02, -REDONDEO2_R * 0.02), (REDONDEO2_R, -REDONDEO2_R * 0.02))
            Line((REDONDEO2_R, -REDONDEO2_R * 0.02), (REDONDEO2_R, 0))
        make_face()
    redondeo2_piece_17b = extrude(amount=25.8, mode=Mode.PRIVATE)
    redondeo2_piece_17b = split(redondeo2_piece_17b, bisect_by=Plane(origin=(-0.226395114, -33.3, -6.773604886), z_dir=(0, -1, 0)), keep=Keep.TOP, mode=Mode.PRIVATE)
    redondeo2_piece_17 = redondeo2_piece_17a & redondeo2_piece_17b
    add(redondeo2_piece_17, mode=Mode.SUBTRACT)
    with BuildSketch(Plane(origin=(0, -10, 0), x_dir=(-1, 0, 0), z_dir=(0, 0, -1))) as redondeo2_piece_18a_section:
        with BuildLine():
            CenterArc((REDONDEO2_R, -REDONDEO2_R), REDONDEO2_R, 90, 90)
            Line((0, -REDONDEO2_R), (-REDONDEO2_R * 0.02, -REDONDEO2_R))
            Line((-REDONDEO2_R * 0.02, -REDONDEO2_R), (-REDONDEO2_R * 0.02, REDONDEO2_R * 0.02))
            Line((-REDONDEO2_R * 0.02, REDONDEO2_R * 0.02), (REDONDEO2_R, REDONDEO2_R * 0.02))
            Line((REDONDEO2_R, REDONDEO2_R * 0.02), (REDONDEO2_R, 0))
        make_face()
    redondeo2_piece_18a = extrude(amount=9.5, mode=Mode.PRIVATE)
    redondeo2_piece_18a = split(redondeo2_piece_18a, bisect_by=Plane(origin=(-0.226395114, -10.226395114, -7), z_dir=(0, 0, -1)), keep=Keep.TOP, mode=Mode.PRIVATE)
    with BuildSketch(Plane(origin=(0, -7.5, -7), x_dir=(0, 0, 1), z_dir=(0, -1, 0))) as redondeo2_piece_18b_section:
        with BuildLine():
            CenterArc((REDONDEO2_R, REDONDEO2_R), REDONDEO2_R, 180, 90)
            Line((0, REDONDEO2_R), (-REDONDEO2_R * 0.02, REDONDEO2_R))
            Line((-REDONDEO2_R * 0.02, REDONDEO2_R), (-REDONDEO2_R * 0.02, -REDONDEO2_R * 0.02))
            Line((-REDONDEO2_R * 0.02, -REDONDEO2_R * 0.02), (REDONDEO2_R, -REDONDEO2_R * 0.02))
            Line((REDONDEO2_R, -REDONDEO2_R * 0.02), (REDONDEO2_R, 0))
        make_face()
    redondeo2_piece_18b = extrude(amount=25.8, mode=Mode.PRIVATE)
    redondeo2_piece_18b = split(redondeo2_piece_18b, bisect_by=Plane(origin=(-0.226395114, -10, -6.773604886), z_dir=(0, 1, 0)), keep=Keep.TOP, mode=Mode.PRIVATE)
    redondeo2_piece_18 = redondeo2_piece_18a & redondeo2_piece_18b
    add(redondeo2_piece_18, mode=Mode.SUBTRACT)
    with BuildSketch(Plane(origin=(21, -10, 0), x_dir=(0, 1, 0), z_dir=(-1, 0, 0))) as redondeo2_piece_19a_section:
        with BuildLine():
            CenterArc((REDONDEO2_R, -REDONDEO2_R), REDONDEO2_R, 90, 90)
            Line((0, -REDONDEO2_R), (-REDONDEO2_R * 0.02, -REDONDEO2_R))
            Line((-REDONDEO2_R * 0.02, -REDONDEO2_R), (-REDONDEO2_R * 0.02, REDONDEO2_R * 0.02))
            Line((-REDONDEO2_R * 0.02, REDONDEO2_R * 0.02), (REDONDEO2_R, REDONDEO2_R * 0.02))
            Line((REDONDEO2_R, REDONDEO2_R * 0.02), (REDONDEO2_R, 0))
        make_face()
    redondeo2_piece_19a = extrude(amount=16.5, mode=Mode.PRIVATE)
    redondeo2_piece_19a = split(redondeo2_piece_19a, bisect_by=Plane(origin=(7, -9.773604886, 0.226395114), z_dir=(-1, 0, 0)), keep=Keep.TOP, mode=Mode.PRIVATE)
    with BuildSketch(Plane(origin=(7, -7.5, 0), x_dir=(-1, 0, 0), z_dir=(0, -1, 0))) as redondeo2_piece_19b_section:
        with BuildLine():
            CenterArc((REDONDEO2_R, -REDONDEO2_R), REDONDEO2_R, 90, 90)
            Line((0, -REDONDEO2_R), (-REDONDEO2_R * 0.02, -REDONDEO2_R))
            Line((-REDONDEO2_R * 0.02, -REDONDEO2_R), (-REDONDEO2_R * 0.02, REDONDEO2_R * 0.02))
            Line((-REDONDEO2_R * 0.02, REDONDEO2_R * 0.02), (REDONDEO2_R, REDONDEO2_R * 0.02))
            Line((REDONDEO2_R, REDONDEO2_R * 0.02), (REDONDEO2_R, 0))
        make_face()
    redondeo2_piece_19b = extrude(amount=25.8, mode=Mode.PRIVATE)
    redondeo2_piece_19b = split(redondeo2_piece_19b, bisect_by=Plane(origin=(6.773604886, -10, 0.226395114), z_dir=(0, 1, 0)), keep=Keep.TOP, mode=Mode.PRIVATE)
    redondeo2_piece_19 = redondeo2_piece_19a & redondeo2_piece_19b
    add(redondeo2_piece_19, mode=Mode.SUBTRACT)
    with BuildSketch(Plane(origin=(24, 12.5, 0), x_dir=(-1, 0, 0), z_dir=(0, -1, 0))) as redondeo2_piece_20a_section:
        with BuildLine():
            CenterArc((REDONDEO2_R, -REDONDEO2_R), REDONDEO2_R, 90, 90)
            Line((0, -REDONDEO2_R), (-REDONDEO2_R * 0.02, -REDONDEO2_R))
            Line((-REDONDEO2_R * 0.02, -REDONDEO2_R), (-REDONDEO2_R * 0.02, REDONDEO2_R * 0.02))
            Line((-REDONDEO2_R * 0.02, REDONDEO2_R * 0.02), (REDONDEO2_R, REDONDEO2_R * 0.02))
            Line((REDONDEO2_R, REDONDEO2_R * 0.02), (REDONDEO2_R, 0))
        make_face()
    redondeo2_piece_20a = extrude(amount=32.5, mode=Mode.PRIVATE)
    redondeo2_piece_20a = split(redondeo2_piece_20a, bisect_by=Plane(origin=(23.773604886, 10, 0.226395114), z_dir=(0, 1, 0)), keep=Keep.TOP, mode=Mode.PRIVATE)
    with BuildSketch(Plane(origin=(24, 10, -2.5), x_dir=(-1, 0, 0), z_dir=(0, 0, 1))) as redondeo2_piece_20b_section:
        with BuildLine():
            CenterArc((REDONDEO2_R, REDONDEO2_R), REDONDEO2_R, 180, 90)
            Line((0, REDONDEO2_R), (-REDONDEO2_R * 0.02, REDONDEO2_R))
            Line((-REDONDEO2_R * 0.02, REDONDEO2_R), (-REDONDEO2_R * 0.02, -REDONDEO2_R * 0.02))
            Line((-REDONDEO2_R * 0.02, -REDONDEO2_R * 0.02), (REDONDEO2_R, -REDONDEO2_R * 0.02))
            Line((REDONDEO2_R, -REDONDEO2_R * 0.02), (REDONDEO2_R, 0))
        make_face()
    redondeo2_piece_20b = extrude(amount=25.5, mode=Mode.PRIVATE)
    redondeo2_piece_20b = split(redondeo2_piece_20b, bisect_by=Plane(origin=(23.773604886, 9.773604886, 0), z_dir=(0, 0, -1)), keep=Keep.TOP, mode=Mode.PRIVATE)
    redondeo2_piece_20 = redondeo2_piece_20a & redondeo2_piece_20b
    add(redondeo2_piece_20, mode=Mode.SUBTRACT)
    with BuildSketch(Plane(origin=(24, 10, 0), x_dir=(-1, 0, 0), z_dir=(0, 0, 1))) as redondeo2_piece_21a_section:
        with BuildLine():
            CenterArc((REDONDEO2_R, REDONDEO2_R), REDONDEO2_R, 180, 90)
            Line((0, REDONDEO2_R), (-REDONDEO2_R * 0.02, REDONDEO2_R))
            Line((-REDONDEO2_R * 0.02, REDONDEO2_R), (-REDONDEO2_R * 0.02, -REDONDEO2_R * 0.02))
            Line((-REDONDEO2_R * 0.02, -REDONDEO2_R * 0.02), (REDONDEO2_R, -REDONDEO2_R * 0.02))
            Line((REDONDEO2_R, -REDONDEO2_R * 0.02), (REDONDEO2_R, 0))
        make_face()
    redondeo2_piece_21a = extrude(amount=25.5, mode=Mode.PRIVATE)
    redondeo2_piece_21a = split(redondeo2_piece_21a, bisect_by=Plane(origin=(23.773604886, 9.773604886, 23), z_dir=(0, 0, 1)), keep=Keep.TOP, mode=Mode.PRIVATE)
    with BuildSketch(Plane(origin=(24, 12.5, 23), x_dir=(0, 0, -1), z_dir=(0, -1, 0))) as redondeo2_piece_21b_section:
        with BuildLine():
            CenterArc((REDONDEO2_R, -REDONDEO2_R), REDONDEO2_R, 90, 90)
            Line((0, -REDONDEO2_R), (-REDONDEO2_R * 0.02, -REDONDEO2_R))
            Line((-REDONDEO2_R * 0.02, -REDONDEO2_R), (-REDONDEO2_R * 0.02, REDONDEO2_R * 0.02))
            Line((-REDONDEO2_R * 0.02, REDONDEO2_R * 0.02), (REDONDEO2_R, REDONDEO2_R * 0.02))
            Line((REDONDEO2_R, REDONDEO2_R * 0.02), (REDONDEO2_R, 0))
        make_face()
    redondeo2_piece_21b = extrude(amount=32.5, mode=Mode.PRIVATE)
    redondeo2_piece_21b = split(redondeo2_piece_21b, bisect_by=Plane(origin=(23.773604886, 10, 22.773604886), z_dir=(0, 1, 0)), keep=Keep.TOP, mode=Mode.PRIVATE)
    redondeo2_piece_21 = redondeo2_piece_21a & redondeo2_piece_21b
    add(redondeo2_piece_21, mode=Mode.SUBTRACT)
    with BuildSketch(Plane(origin=(24, 10, 0), x_dir=(-1, 0, 0), z_dir=(0, -1, 0))) as redondeo2_piece_22a_section:
        with BuildLine():
            CenterArc((REDONDEO2_R, -REDONDEO2_R), REDONDEO2_R, 90, 90)
            Line((0, -REDONDEO2_R), (-REDONDEO2_R * 0.02, -REDONDEO2_R))
            Line((-REDONDEO2_R * 0.02, -REDONDEO2_R), (-REDONDEO2_R * 0.02, REDONDEO2_R * 0.02))
            Line((-REDONDEO2_R * 0.02, REDONDEO2_R * 0.02), (REDONDEO2_R, REDONDEO2_R * 0.02))
            Line((REDONDEO2_R, REDONDEO2_R * 0.02), (REDONDEO2_R, 0))
        make_face()
    redondeo2_piece_22a = extrude(amount=32.5, mode=Mode.PRIVATE)
    redondeo2_piece_22a = split(redondeo2_piece_22a, bisect_by=Plane(origin=(23.773604886, -20, 0.226395114), z_dir=(0, -1, 0)), keep=Keep.TOP, mode=Mode.PRIVATE)
    with BuildSketch(Plane(origin=(24, -20, -2.5), x_dir=(-1, 0, 0), z_dir=(0, 0, 1))) as redondeo2_piece_22b_section:
        with BuildLine():
            CenterArc((REDONDEO2_R, -REDONDEO2_R), REDONDEO2_R, 90, 90)
            Line((0, -REDONDEO2_R), (-REDONDEO2_R * 0.02, -REDONDEO2_R))
            Line((-REDONDEO2_R * 0.02, -REDONDEO2_R), (-REDONDEO2_R * 0.02, REDONDEO2_R * 0.02))
            Line((-REDONDEO2_R * 0.02, REDONDEO2_R * 0.02), (REDONDEO2_R, REDONDEO2_R * 0.02))
            Line((REDONDEO2_R, REDONDEO2_R * 0.02), (REDONDEO2_R, 0))
        make_face()
    redondeo2_piece_22b = extrude(amount=25.5, mode=Mode.PRIVATE)
    redondeo2_piece_22b = split(redondeo2_piece_22b, bisect_by=Plane(origin=(23.773604886, -19.773604886, 0), z_dir=(0, 0, -1)), keep=Keep.TOP, mode=Mode.PRIVATE)
    redondeo2_piece_22 = redondeo2_piece_22a & redondeo2_piece_22b
    add(redondeo2_piece_22, mode=Mode.SUBTRACT)
    with BuildSketch(Plane(origin=(24, -20, 0), x_dir=(-1, 0, 0), z_dir=(0, 0, 1))) as redondeo2_piece_23a_section:
        with BuildLine():
            CenterArc((REDONDEO2_R, -REDONDEO2_R), REDONDEO2_R, 90, 90)
            Line((0, -REDONDEO2_R), (-REDONDEO2_R * 0.02, -REDONDEO2_R))
            Line((-REDONDEO2_R * 0.02, -REDONDEO2_R), (-REDONDEO2_R * 0.02, REDONDEO2_R * 0.02))
            Line((-REDONDEO2_R * 0.02, REDONDEO2_R * 0.02), (REDONDEO2_R, REDONDEO2_R * 0.02))
            Line((REDONDEO2_R, REDONDEO2_R * 0.02), (REDONDEO2_R, 0))
        make_face()
    redondeo2_piece_23a = extrude(amount=25.5, mode=Mode.PRIVATE)
    redondeo2_piece_23a = split(redondeo2_piece_23a, bisect_by=Plane(origin=(23.773604886, -19.773604886, 23), z_dir=(0, 0, 1)), keep=Keep.TOP, mode=Mode.PRIVATE)
    with BuildSketch(Plane(origin=(24, 10, 23), x_dir=(0, 0, -1), z_dir=(0, -1, 0))) as redondeo2_piece_23b_section:
        with BuildLine():
            CenterArc((REDONDEO2_R, -REDONDEO2_R), REDONDEO2_R, 90, 90)
            Line((0, -REDONDEO2_R), (-REDONDEO2_R * 0.02, -REDONDEO2_R))
            Line((-REDONDEO2_R * 0.02, -REDONDEO2_R), (-REDONDEO2_R * 0.02, REDONDEO2_R * 0.02))
            Line((-REDONDEO2_R * 0.02, REDONDEO2_R * 0.02), (REDONDEO2_R, REDONDEO2_R * 0.02))
            Line((REDONDEO2_R, REDONDEO2_R * 0.02), (REDONDEO2_R, 0))
        make_face()
    redondeo2_piece_23b = extrude(amount=32.5, mode=Mode.PRIVATE)
    redondeo2_piece_23b = split(redondeo2_piece_23b, bisect_by=Plane(origin=(23.773604886, -20, 22.773604886), z_dir=(0, -1, 0)), keep=Keep.TOP, mode=Mode.PRIVATE)
    redondeo2_piece_23 = redondeo2_piece_23a & redondeo2_piece_23b
    add(redondeo2_piece_23, mode=Mode.SUBTRACT)

    # Croquis18 → Cortar-Extruir10 (cut, through all)
    with BuildSketch(Plane(origin=(0, -44.3, 0), x_dir=(-1, 0, 0), z_dir=(0, -1, 0))):
        with Locations((-10.5, -20.75)):
            Rectangle(CROQUIS18_W, CROQUIS18_H)
    extrude(amount=-CORTAR_EXTRUIR10_DEPTH, mode=Mode.SUBTRACT)


solid = part_1.part
